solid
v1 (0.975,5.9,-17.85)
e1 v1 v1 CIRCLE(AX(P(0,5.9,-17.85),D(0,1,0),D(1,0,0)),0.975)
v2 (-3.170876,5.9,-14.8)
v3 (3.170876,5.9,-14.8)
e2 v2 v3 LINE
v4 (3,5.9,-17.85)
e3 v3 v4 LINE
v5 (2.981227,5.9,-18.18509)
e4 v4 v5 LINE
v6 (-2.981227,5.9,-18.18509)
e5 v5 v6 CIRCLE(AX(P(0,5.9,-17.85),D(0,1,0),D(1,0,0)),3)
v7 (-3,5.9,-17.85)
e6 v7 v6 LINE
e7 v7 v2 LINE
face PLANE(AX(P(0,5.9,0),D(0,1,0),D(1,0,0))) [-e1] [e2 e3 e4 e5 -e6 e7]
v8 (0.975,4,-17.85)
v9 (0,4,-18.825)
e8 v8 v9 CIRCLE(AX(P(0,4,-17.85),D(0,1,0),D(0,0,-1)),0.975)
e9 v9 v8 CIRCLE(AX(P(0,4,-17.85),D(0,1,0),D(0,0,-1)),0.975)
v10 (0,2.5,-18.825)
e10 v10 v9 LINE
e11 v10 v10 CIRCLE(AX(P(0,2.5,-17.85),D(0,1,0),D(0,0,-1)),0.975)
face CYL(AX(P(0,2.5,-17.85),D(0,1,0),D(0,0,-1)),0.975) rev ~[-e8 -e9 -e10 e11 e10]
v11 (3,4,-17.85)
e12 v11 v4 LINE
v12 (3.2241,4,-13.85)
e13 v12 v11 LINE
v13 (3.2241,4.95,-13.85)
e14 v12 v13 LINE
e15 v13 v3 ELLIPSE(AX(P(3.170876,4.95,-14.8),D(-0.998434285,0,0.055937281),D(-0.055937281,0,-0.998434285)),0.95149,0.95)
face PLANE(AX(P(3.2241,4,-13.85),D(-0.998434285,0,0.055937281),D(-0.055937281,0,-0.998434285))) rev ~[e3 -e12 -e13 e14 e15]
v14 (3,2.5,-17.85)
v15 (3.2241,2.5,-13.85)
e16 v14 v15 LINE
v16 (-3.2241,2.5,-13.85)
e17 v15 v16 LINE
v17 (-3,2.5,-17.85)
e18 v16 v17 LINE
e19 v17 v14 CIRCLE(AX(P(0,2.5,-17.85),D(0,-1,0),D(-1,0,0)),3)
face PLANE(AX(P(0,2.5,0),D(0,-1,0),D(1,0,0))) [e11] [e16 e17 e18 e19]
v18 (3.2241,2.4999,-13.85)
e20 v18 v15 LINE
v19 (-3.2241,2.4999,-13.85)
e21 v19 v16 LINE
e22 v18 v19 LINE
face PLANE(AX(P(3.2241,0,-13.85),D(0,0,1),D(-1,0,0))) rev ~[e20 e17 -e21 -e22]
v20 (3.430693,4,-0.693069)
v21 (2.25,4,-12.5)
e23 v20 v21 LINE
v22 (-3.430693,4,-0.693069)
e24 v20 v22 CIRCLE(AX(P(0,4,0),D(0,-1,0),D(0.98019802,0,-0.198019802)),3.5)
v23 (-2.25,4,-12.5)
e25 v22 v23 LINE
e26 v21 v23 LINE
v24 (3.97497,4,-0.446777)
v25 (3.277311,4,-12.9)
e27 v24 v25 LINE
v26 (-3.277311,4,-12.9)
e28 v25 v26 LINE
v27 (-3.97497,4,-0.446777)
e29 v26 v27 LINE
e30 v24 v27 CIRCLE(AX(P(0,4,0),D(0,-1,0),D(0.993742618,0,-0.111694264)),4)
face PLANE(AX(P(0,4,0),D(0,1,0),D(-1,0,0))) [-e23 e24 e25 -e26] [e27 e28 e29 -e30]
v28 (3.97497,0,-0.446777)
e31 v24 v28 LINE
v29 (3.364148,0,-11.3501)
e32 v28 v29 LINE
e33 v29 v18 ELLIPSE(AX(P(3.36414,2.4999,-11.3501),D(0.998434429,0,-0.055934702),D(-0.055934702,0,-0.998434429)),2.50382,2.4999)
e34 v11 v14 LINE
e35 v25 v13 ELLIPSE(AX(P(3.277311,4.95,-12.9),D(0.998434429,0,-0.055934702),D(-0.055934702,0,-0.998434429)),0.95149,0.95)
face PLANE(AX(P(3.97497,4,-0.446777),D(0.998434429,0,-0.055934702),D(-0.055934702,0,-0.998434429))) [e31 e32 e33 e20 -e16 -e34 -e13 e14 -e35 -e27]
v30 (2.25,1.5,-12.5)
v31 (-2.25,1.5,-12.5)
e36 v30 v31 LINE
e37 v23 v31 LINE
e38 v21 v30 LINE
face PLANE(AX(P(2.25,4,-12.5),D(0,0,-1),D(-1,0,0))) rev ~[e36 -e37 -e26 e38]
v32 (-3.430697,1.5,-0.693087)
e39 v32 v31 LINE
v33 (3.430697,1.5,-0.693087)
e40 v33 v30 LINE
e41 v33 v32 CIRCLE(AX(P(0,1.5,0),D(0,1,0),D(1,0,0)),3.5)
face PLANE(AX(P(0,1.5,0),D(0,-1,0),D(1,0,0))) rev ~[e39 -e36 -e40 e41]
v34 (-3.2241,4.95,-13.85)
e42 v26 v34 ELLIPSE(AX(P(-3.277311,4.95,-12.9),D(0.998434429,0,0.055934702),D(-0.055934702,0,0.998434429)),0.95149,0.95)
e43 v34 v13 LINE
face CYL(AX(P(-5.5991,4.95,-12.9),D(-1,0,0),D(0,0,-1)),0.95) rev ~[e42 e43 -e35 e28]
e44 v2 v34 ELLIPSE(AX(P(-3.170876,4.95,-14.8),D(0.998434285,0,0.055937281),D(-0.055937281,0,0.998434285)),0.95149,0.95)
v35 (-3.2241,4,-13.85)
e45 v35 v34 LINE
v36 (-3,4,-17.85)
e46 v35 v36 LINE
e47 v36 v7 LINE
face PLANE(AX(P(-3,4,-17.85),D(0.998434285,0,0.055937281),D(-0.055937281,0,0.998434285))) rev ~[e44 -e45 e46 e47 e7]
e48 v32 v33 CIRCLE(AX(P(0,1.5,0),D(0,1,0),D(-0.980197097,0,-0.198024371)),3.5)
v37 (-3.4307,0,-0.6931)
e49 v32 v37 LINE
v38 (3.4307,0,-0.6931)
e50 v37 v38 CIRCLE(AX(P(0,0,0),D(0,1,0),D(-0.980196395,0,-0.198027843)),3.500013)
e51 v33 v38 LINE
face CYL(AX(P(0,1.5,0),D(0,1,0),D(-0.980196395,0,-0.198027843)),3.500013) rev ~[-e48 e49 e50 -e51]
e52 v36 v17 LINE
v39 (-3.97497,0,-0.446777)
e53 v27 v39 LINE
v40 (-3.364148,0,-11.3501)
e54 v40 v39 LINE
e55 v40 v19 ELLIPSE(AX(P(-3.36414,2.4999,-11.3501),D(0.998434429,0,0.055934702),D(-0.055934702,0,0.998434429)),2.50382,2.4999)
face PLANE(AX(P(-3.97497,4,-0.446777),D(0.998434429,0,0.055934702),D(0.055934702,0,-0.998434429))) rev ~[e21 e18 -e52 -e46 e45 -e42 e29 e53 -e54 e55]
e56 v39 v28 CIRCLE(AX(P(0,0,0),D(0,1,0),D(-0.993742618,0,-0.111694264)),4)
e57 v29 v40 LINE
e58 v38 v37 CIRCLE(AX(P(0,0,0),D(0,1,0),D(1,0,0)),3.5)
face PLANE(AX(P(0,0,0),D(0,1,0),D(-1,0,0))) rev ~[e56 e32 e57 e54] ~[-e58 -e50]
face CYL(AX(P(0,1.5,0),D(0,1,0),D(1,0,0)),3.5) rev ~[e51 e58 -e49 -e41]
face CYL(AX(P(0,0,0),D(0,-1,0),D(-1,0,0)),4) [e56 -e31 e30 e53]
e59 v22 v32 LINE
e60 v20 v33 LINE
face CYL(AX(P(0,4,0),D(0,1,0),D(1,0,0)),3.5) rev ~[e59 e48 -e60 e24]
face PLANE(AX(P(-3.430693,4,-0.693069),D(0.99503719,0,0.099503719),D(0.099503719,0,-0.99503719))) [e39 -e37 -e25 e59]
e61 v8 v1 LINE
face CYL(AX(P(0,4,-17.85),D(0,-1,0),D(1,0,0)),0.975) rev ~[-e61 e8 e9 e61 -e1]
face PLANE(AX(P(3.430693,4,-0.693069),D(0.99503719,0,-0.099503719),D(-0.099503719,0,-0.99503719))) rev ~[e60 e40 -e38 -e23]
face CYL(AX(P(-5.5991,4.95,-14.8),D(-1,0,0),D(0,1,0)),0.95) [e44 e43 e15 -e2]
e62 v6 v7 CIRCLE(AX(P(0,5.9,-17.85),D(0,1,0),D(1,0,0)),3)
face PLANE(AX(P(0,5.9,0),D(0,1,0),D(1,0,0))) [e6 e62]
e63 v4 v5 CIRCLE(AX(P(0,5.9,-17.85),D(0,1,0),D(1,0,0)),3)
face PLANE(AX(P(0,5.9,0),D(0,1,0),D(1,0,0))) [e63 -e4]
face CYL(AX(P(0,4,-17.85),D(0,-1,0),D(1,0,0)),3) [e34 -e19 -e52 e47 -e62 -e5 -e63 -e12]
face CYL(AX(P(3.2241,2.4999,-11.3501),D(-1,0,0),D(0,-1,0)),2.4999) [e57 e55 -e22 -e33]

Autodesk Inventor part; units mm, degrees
ref_plane "YZ Plane" through (0, 0, 0) normal (1, 0, 0) x (0, 1, 0)
ref_plane "XZ Plane" through (0, 0, 0) normal (0, 1, 0) x (-1, 0, 0)
ref_plane "XY Plane" through (0, 0, 0) normal (0, 0, 1) x (1, 0, 0)
sketch "Эскиз1" plane through (0, 0, 0) normal (0, 1, 0) x (-1, 0, 0)
  circle A0 centre (0, 0) radius 4
  dimension "d0" = 8
extrude "Выдавливание1" add sketch "Эскиз1" along normal blind 4
sketch "Эскиз5" plane through (0, 4, 0) normal (0, 1, 0) x (1, 0, 0)
  circle A0 centre (0, 0) radius 4 projected
  line L0 (-4, 0) -> (4, 0)
  line L1 (4, 0) -> (4, 17.85)
  line L2 (4, 17.85) -> (-4, 17.85)
  line L3 (-4, 17.85) -> (-4, 0)
  circle A1 centre (0, 0) radius 4 projected
  circle A2 centre (0, 17.85) radius 3
  line L4 (4, 0) -> (3, 17.85)
  line L5 (-4, 0) -> (-3, 17.85)
  point P0 (4, 0)
  point P1 (-3.975, 0.4468)
  point P2 (3.975, 0.4468)
  dimension "d27" = 17.85
  dimension "d59" = 6
extrude "Выдавливание4" add sketch "Эскиз5" against normal blind 4 contours L5 A2 L4 A0 | A2 L2 | L2 A2
sketch "Эскиз9" plane through (0, 4, 0) normal (0, -1, 0) x (1, 0, 0)
  circle A0 centre (0, 0) radius 3.5
  line L0 (3.5, 0) -> (-3.5, 0)
  line L1 (3.5, 0) -> (2.25, -12.5)
  line L2 (-3.5, 0) -> (-2.25, -12.5)
  line L3 (2.25, -12.5) -> (-2.25, -12.5)
  point P0 (0, -12.5)
  point P1 (-3.4307, -0.6931)
  point P2 (3.4307, -0.6931)
  dimension "d43" = 7
  dimension "d44" = 4.5
  dimension "d45" = 12.5
extrude "Выдавливание7" cut sketch "Эскиз9" along normal blind 2.5
sketch "Эскиз10" plane through (0, 1.5, 0) normal (0, 1, 0) x (1, 0, 0)
  line L0 (2.25, 12.5) -> (3.4307, 0.6931) projected
  line L1 (-3.4307, 0.6931) -> (-2.25, 12.5) projected
  arc A0 (-3.4307, 0.6931) -> (3.4307, 0.6931) centre (0, 0) ccw projected
  arc A1 (-3.4307, 0.6931) -> (3.4307, 0.6931) centre (0, 0) ccw projected
  circle A2 centre (0, 0) radius 3.5
  line L2 (-2.25, 12.5) -> (2.25, 12.5) projected
  point P0 (3.4307, 0.6931)
extrude "Выдавливание8" cut sketch "Эскиз10" against normal through all contours A0 A2
sketch "Эскиз13" plane through (0, 0, 0) normal (0, -1, 0) x (1, 0, 0)
  arc A0 (-3, -17.85) -> (3, -17.85) centre (0, -17.85) ccw projected
  circle A1 centre (0, -17.85) radius 3
  line L0 (-2.25, -12.5) -> (2.25, -12.5) projected
  line L1 (-2.25, -12.5) -> (2.25, -12.5) projected
  line L2 (3.2241, -13.85) -> (-3.2241, -13.85)
  line L3 (-3.2241, -13.85) -> (-3.2241, -20.85)
  line L4 (-3.2241, -20.85) -> (3.2241, -20.85)
  line L5 (3.2241, -20.85) -> (3.2241, -13.85)
  line L6 (-3.975, -0.4468) -> (-3, -17.85) projected
  line L7 (3, -17.85) -> (3.975, -0.4468) projected
  point P0 (0, 0)
  point P1 (3, -17.85)
  dimension "d71" = 7
extrude "Выдавливание10" cut sketch "Эскиз13" against normal blind 2.5 contours A1 A0 | L6 L2 L7 A1
sketch "Эскиз14" plane through (0, 2.5, -17.85) normal (0, -1, 0) x (-1, 0, 0)
  arc A0 (3, 0) -> (-3, 0) centre (0, 0) ccw projected
  line L0 (-3.2241, -4) -> (-3, 0) projected
  line L1 (3, 0) -> (3.2241, -4) projected
  line L2 (3.2241, -4) -> (-3.2241, -4) projected
  point P0 (0, -17.85)
hole "Отверстие4" at (0, 2.5, -17.85) direction (0, 1, 0) diameter 1.95 depth 4
sketch "Эскиз15" plane through (0, 4, 0) normal (0, 1, 0) x (1, 0, 0)
  circle A0 centre (0, 17.85) radius 0.975 projected
  arc A1 (3, 17.85) -> (-3, 17.85) centre (0, 17.85) ccw projected
  line L0 (3.2241, 13.85) -> (3, 17.85) projected
  line L1 (-3, 17.85) -> (-3.2241, 13.85) projected
  line L2 (-3.2241, 13.85) -> (3.2241, 13.85) projected
  point P0 (0, 0)
extrude "Выдавливание11" add sketch "Эскиз15" along normal blind 1.9
fillet "Сопряжение1" radius 0.95 2 edges at (0, 4, -13.85) (0, 5.9, -13.85)
fillet "Сопряжение2" radius 2.5 1 edges at (0, 0, -13.85)
properties part number "Поворотный рычаг для сервы"
